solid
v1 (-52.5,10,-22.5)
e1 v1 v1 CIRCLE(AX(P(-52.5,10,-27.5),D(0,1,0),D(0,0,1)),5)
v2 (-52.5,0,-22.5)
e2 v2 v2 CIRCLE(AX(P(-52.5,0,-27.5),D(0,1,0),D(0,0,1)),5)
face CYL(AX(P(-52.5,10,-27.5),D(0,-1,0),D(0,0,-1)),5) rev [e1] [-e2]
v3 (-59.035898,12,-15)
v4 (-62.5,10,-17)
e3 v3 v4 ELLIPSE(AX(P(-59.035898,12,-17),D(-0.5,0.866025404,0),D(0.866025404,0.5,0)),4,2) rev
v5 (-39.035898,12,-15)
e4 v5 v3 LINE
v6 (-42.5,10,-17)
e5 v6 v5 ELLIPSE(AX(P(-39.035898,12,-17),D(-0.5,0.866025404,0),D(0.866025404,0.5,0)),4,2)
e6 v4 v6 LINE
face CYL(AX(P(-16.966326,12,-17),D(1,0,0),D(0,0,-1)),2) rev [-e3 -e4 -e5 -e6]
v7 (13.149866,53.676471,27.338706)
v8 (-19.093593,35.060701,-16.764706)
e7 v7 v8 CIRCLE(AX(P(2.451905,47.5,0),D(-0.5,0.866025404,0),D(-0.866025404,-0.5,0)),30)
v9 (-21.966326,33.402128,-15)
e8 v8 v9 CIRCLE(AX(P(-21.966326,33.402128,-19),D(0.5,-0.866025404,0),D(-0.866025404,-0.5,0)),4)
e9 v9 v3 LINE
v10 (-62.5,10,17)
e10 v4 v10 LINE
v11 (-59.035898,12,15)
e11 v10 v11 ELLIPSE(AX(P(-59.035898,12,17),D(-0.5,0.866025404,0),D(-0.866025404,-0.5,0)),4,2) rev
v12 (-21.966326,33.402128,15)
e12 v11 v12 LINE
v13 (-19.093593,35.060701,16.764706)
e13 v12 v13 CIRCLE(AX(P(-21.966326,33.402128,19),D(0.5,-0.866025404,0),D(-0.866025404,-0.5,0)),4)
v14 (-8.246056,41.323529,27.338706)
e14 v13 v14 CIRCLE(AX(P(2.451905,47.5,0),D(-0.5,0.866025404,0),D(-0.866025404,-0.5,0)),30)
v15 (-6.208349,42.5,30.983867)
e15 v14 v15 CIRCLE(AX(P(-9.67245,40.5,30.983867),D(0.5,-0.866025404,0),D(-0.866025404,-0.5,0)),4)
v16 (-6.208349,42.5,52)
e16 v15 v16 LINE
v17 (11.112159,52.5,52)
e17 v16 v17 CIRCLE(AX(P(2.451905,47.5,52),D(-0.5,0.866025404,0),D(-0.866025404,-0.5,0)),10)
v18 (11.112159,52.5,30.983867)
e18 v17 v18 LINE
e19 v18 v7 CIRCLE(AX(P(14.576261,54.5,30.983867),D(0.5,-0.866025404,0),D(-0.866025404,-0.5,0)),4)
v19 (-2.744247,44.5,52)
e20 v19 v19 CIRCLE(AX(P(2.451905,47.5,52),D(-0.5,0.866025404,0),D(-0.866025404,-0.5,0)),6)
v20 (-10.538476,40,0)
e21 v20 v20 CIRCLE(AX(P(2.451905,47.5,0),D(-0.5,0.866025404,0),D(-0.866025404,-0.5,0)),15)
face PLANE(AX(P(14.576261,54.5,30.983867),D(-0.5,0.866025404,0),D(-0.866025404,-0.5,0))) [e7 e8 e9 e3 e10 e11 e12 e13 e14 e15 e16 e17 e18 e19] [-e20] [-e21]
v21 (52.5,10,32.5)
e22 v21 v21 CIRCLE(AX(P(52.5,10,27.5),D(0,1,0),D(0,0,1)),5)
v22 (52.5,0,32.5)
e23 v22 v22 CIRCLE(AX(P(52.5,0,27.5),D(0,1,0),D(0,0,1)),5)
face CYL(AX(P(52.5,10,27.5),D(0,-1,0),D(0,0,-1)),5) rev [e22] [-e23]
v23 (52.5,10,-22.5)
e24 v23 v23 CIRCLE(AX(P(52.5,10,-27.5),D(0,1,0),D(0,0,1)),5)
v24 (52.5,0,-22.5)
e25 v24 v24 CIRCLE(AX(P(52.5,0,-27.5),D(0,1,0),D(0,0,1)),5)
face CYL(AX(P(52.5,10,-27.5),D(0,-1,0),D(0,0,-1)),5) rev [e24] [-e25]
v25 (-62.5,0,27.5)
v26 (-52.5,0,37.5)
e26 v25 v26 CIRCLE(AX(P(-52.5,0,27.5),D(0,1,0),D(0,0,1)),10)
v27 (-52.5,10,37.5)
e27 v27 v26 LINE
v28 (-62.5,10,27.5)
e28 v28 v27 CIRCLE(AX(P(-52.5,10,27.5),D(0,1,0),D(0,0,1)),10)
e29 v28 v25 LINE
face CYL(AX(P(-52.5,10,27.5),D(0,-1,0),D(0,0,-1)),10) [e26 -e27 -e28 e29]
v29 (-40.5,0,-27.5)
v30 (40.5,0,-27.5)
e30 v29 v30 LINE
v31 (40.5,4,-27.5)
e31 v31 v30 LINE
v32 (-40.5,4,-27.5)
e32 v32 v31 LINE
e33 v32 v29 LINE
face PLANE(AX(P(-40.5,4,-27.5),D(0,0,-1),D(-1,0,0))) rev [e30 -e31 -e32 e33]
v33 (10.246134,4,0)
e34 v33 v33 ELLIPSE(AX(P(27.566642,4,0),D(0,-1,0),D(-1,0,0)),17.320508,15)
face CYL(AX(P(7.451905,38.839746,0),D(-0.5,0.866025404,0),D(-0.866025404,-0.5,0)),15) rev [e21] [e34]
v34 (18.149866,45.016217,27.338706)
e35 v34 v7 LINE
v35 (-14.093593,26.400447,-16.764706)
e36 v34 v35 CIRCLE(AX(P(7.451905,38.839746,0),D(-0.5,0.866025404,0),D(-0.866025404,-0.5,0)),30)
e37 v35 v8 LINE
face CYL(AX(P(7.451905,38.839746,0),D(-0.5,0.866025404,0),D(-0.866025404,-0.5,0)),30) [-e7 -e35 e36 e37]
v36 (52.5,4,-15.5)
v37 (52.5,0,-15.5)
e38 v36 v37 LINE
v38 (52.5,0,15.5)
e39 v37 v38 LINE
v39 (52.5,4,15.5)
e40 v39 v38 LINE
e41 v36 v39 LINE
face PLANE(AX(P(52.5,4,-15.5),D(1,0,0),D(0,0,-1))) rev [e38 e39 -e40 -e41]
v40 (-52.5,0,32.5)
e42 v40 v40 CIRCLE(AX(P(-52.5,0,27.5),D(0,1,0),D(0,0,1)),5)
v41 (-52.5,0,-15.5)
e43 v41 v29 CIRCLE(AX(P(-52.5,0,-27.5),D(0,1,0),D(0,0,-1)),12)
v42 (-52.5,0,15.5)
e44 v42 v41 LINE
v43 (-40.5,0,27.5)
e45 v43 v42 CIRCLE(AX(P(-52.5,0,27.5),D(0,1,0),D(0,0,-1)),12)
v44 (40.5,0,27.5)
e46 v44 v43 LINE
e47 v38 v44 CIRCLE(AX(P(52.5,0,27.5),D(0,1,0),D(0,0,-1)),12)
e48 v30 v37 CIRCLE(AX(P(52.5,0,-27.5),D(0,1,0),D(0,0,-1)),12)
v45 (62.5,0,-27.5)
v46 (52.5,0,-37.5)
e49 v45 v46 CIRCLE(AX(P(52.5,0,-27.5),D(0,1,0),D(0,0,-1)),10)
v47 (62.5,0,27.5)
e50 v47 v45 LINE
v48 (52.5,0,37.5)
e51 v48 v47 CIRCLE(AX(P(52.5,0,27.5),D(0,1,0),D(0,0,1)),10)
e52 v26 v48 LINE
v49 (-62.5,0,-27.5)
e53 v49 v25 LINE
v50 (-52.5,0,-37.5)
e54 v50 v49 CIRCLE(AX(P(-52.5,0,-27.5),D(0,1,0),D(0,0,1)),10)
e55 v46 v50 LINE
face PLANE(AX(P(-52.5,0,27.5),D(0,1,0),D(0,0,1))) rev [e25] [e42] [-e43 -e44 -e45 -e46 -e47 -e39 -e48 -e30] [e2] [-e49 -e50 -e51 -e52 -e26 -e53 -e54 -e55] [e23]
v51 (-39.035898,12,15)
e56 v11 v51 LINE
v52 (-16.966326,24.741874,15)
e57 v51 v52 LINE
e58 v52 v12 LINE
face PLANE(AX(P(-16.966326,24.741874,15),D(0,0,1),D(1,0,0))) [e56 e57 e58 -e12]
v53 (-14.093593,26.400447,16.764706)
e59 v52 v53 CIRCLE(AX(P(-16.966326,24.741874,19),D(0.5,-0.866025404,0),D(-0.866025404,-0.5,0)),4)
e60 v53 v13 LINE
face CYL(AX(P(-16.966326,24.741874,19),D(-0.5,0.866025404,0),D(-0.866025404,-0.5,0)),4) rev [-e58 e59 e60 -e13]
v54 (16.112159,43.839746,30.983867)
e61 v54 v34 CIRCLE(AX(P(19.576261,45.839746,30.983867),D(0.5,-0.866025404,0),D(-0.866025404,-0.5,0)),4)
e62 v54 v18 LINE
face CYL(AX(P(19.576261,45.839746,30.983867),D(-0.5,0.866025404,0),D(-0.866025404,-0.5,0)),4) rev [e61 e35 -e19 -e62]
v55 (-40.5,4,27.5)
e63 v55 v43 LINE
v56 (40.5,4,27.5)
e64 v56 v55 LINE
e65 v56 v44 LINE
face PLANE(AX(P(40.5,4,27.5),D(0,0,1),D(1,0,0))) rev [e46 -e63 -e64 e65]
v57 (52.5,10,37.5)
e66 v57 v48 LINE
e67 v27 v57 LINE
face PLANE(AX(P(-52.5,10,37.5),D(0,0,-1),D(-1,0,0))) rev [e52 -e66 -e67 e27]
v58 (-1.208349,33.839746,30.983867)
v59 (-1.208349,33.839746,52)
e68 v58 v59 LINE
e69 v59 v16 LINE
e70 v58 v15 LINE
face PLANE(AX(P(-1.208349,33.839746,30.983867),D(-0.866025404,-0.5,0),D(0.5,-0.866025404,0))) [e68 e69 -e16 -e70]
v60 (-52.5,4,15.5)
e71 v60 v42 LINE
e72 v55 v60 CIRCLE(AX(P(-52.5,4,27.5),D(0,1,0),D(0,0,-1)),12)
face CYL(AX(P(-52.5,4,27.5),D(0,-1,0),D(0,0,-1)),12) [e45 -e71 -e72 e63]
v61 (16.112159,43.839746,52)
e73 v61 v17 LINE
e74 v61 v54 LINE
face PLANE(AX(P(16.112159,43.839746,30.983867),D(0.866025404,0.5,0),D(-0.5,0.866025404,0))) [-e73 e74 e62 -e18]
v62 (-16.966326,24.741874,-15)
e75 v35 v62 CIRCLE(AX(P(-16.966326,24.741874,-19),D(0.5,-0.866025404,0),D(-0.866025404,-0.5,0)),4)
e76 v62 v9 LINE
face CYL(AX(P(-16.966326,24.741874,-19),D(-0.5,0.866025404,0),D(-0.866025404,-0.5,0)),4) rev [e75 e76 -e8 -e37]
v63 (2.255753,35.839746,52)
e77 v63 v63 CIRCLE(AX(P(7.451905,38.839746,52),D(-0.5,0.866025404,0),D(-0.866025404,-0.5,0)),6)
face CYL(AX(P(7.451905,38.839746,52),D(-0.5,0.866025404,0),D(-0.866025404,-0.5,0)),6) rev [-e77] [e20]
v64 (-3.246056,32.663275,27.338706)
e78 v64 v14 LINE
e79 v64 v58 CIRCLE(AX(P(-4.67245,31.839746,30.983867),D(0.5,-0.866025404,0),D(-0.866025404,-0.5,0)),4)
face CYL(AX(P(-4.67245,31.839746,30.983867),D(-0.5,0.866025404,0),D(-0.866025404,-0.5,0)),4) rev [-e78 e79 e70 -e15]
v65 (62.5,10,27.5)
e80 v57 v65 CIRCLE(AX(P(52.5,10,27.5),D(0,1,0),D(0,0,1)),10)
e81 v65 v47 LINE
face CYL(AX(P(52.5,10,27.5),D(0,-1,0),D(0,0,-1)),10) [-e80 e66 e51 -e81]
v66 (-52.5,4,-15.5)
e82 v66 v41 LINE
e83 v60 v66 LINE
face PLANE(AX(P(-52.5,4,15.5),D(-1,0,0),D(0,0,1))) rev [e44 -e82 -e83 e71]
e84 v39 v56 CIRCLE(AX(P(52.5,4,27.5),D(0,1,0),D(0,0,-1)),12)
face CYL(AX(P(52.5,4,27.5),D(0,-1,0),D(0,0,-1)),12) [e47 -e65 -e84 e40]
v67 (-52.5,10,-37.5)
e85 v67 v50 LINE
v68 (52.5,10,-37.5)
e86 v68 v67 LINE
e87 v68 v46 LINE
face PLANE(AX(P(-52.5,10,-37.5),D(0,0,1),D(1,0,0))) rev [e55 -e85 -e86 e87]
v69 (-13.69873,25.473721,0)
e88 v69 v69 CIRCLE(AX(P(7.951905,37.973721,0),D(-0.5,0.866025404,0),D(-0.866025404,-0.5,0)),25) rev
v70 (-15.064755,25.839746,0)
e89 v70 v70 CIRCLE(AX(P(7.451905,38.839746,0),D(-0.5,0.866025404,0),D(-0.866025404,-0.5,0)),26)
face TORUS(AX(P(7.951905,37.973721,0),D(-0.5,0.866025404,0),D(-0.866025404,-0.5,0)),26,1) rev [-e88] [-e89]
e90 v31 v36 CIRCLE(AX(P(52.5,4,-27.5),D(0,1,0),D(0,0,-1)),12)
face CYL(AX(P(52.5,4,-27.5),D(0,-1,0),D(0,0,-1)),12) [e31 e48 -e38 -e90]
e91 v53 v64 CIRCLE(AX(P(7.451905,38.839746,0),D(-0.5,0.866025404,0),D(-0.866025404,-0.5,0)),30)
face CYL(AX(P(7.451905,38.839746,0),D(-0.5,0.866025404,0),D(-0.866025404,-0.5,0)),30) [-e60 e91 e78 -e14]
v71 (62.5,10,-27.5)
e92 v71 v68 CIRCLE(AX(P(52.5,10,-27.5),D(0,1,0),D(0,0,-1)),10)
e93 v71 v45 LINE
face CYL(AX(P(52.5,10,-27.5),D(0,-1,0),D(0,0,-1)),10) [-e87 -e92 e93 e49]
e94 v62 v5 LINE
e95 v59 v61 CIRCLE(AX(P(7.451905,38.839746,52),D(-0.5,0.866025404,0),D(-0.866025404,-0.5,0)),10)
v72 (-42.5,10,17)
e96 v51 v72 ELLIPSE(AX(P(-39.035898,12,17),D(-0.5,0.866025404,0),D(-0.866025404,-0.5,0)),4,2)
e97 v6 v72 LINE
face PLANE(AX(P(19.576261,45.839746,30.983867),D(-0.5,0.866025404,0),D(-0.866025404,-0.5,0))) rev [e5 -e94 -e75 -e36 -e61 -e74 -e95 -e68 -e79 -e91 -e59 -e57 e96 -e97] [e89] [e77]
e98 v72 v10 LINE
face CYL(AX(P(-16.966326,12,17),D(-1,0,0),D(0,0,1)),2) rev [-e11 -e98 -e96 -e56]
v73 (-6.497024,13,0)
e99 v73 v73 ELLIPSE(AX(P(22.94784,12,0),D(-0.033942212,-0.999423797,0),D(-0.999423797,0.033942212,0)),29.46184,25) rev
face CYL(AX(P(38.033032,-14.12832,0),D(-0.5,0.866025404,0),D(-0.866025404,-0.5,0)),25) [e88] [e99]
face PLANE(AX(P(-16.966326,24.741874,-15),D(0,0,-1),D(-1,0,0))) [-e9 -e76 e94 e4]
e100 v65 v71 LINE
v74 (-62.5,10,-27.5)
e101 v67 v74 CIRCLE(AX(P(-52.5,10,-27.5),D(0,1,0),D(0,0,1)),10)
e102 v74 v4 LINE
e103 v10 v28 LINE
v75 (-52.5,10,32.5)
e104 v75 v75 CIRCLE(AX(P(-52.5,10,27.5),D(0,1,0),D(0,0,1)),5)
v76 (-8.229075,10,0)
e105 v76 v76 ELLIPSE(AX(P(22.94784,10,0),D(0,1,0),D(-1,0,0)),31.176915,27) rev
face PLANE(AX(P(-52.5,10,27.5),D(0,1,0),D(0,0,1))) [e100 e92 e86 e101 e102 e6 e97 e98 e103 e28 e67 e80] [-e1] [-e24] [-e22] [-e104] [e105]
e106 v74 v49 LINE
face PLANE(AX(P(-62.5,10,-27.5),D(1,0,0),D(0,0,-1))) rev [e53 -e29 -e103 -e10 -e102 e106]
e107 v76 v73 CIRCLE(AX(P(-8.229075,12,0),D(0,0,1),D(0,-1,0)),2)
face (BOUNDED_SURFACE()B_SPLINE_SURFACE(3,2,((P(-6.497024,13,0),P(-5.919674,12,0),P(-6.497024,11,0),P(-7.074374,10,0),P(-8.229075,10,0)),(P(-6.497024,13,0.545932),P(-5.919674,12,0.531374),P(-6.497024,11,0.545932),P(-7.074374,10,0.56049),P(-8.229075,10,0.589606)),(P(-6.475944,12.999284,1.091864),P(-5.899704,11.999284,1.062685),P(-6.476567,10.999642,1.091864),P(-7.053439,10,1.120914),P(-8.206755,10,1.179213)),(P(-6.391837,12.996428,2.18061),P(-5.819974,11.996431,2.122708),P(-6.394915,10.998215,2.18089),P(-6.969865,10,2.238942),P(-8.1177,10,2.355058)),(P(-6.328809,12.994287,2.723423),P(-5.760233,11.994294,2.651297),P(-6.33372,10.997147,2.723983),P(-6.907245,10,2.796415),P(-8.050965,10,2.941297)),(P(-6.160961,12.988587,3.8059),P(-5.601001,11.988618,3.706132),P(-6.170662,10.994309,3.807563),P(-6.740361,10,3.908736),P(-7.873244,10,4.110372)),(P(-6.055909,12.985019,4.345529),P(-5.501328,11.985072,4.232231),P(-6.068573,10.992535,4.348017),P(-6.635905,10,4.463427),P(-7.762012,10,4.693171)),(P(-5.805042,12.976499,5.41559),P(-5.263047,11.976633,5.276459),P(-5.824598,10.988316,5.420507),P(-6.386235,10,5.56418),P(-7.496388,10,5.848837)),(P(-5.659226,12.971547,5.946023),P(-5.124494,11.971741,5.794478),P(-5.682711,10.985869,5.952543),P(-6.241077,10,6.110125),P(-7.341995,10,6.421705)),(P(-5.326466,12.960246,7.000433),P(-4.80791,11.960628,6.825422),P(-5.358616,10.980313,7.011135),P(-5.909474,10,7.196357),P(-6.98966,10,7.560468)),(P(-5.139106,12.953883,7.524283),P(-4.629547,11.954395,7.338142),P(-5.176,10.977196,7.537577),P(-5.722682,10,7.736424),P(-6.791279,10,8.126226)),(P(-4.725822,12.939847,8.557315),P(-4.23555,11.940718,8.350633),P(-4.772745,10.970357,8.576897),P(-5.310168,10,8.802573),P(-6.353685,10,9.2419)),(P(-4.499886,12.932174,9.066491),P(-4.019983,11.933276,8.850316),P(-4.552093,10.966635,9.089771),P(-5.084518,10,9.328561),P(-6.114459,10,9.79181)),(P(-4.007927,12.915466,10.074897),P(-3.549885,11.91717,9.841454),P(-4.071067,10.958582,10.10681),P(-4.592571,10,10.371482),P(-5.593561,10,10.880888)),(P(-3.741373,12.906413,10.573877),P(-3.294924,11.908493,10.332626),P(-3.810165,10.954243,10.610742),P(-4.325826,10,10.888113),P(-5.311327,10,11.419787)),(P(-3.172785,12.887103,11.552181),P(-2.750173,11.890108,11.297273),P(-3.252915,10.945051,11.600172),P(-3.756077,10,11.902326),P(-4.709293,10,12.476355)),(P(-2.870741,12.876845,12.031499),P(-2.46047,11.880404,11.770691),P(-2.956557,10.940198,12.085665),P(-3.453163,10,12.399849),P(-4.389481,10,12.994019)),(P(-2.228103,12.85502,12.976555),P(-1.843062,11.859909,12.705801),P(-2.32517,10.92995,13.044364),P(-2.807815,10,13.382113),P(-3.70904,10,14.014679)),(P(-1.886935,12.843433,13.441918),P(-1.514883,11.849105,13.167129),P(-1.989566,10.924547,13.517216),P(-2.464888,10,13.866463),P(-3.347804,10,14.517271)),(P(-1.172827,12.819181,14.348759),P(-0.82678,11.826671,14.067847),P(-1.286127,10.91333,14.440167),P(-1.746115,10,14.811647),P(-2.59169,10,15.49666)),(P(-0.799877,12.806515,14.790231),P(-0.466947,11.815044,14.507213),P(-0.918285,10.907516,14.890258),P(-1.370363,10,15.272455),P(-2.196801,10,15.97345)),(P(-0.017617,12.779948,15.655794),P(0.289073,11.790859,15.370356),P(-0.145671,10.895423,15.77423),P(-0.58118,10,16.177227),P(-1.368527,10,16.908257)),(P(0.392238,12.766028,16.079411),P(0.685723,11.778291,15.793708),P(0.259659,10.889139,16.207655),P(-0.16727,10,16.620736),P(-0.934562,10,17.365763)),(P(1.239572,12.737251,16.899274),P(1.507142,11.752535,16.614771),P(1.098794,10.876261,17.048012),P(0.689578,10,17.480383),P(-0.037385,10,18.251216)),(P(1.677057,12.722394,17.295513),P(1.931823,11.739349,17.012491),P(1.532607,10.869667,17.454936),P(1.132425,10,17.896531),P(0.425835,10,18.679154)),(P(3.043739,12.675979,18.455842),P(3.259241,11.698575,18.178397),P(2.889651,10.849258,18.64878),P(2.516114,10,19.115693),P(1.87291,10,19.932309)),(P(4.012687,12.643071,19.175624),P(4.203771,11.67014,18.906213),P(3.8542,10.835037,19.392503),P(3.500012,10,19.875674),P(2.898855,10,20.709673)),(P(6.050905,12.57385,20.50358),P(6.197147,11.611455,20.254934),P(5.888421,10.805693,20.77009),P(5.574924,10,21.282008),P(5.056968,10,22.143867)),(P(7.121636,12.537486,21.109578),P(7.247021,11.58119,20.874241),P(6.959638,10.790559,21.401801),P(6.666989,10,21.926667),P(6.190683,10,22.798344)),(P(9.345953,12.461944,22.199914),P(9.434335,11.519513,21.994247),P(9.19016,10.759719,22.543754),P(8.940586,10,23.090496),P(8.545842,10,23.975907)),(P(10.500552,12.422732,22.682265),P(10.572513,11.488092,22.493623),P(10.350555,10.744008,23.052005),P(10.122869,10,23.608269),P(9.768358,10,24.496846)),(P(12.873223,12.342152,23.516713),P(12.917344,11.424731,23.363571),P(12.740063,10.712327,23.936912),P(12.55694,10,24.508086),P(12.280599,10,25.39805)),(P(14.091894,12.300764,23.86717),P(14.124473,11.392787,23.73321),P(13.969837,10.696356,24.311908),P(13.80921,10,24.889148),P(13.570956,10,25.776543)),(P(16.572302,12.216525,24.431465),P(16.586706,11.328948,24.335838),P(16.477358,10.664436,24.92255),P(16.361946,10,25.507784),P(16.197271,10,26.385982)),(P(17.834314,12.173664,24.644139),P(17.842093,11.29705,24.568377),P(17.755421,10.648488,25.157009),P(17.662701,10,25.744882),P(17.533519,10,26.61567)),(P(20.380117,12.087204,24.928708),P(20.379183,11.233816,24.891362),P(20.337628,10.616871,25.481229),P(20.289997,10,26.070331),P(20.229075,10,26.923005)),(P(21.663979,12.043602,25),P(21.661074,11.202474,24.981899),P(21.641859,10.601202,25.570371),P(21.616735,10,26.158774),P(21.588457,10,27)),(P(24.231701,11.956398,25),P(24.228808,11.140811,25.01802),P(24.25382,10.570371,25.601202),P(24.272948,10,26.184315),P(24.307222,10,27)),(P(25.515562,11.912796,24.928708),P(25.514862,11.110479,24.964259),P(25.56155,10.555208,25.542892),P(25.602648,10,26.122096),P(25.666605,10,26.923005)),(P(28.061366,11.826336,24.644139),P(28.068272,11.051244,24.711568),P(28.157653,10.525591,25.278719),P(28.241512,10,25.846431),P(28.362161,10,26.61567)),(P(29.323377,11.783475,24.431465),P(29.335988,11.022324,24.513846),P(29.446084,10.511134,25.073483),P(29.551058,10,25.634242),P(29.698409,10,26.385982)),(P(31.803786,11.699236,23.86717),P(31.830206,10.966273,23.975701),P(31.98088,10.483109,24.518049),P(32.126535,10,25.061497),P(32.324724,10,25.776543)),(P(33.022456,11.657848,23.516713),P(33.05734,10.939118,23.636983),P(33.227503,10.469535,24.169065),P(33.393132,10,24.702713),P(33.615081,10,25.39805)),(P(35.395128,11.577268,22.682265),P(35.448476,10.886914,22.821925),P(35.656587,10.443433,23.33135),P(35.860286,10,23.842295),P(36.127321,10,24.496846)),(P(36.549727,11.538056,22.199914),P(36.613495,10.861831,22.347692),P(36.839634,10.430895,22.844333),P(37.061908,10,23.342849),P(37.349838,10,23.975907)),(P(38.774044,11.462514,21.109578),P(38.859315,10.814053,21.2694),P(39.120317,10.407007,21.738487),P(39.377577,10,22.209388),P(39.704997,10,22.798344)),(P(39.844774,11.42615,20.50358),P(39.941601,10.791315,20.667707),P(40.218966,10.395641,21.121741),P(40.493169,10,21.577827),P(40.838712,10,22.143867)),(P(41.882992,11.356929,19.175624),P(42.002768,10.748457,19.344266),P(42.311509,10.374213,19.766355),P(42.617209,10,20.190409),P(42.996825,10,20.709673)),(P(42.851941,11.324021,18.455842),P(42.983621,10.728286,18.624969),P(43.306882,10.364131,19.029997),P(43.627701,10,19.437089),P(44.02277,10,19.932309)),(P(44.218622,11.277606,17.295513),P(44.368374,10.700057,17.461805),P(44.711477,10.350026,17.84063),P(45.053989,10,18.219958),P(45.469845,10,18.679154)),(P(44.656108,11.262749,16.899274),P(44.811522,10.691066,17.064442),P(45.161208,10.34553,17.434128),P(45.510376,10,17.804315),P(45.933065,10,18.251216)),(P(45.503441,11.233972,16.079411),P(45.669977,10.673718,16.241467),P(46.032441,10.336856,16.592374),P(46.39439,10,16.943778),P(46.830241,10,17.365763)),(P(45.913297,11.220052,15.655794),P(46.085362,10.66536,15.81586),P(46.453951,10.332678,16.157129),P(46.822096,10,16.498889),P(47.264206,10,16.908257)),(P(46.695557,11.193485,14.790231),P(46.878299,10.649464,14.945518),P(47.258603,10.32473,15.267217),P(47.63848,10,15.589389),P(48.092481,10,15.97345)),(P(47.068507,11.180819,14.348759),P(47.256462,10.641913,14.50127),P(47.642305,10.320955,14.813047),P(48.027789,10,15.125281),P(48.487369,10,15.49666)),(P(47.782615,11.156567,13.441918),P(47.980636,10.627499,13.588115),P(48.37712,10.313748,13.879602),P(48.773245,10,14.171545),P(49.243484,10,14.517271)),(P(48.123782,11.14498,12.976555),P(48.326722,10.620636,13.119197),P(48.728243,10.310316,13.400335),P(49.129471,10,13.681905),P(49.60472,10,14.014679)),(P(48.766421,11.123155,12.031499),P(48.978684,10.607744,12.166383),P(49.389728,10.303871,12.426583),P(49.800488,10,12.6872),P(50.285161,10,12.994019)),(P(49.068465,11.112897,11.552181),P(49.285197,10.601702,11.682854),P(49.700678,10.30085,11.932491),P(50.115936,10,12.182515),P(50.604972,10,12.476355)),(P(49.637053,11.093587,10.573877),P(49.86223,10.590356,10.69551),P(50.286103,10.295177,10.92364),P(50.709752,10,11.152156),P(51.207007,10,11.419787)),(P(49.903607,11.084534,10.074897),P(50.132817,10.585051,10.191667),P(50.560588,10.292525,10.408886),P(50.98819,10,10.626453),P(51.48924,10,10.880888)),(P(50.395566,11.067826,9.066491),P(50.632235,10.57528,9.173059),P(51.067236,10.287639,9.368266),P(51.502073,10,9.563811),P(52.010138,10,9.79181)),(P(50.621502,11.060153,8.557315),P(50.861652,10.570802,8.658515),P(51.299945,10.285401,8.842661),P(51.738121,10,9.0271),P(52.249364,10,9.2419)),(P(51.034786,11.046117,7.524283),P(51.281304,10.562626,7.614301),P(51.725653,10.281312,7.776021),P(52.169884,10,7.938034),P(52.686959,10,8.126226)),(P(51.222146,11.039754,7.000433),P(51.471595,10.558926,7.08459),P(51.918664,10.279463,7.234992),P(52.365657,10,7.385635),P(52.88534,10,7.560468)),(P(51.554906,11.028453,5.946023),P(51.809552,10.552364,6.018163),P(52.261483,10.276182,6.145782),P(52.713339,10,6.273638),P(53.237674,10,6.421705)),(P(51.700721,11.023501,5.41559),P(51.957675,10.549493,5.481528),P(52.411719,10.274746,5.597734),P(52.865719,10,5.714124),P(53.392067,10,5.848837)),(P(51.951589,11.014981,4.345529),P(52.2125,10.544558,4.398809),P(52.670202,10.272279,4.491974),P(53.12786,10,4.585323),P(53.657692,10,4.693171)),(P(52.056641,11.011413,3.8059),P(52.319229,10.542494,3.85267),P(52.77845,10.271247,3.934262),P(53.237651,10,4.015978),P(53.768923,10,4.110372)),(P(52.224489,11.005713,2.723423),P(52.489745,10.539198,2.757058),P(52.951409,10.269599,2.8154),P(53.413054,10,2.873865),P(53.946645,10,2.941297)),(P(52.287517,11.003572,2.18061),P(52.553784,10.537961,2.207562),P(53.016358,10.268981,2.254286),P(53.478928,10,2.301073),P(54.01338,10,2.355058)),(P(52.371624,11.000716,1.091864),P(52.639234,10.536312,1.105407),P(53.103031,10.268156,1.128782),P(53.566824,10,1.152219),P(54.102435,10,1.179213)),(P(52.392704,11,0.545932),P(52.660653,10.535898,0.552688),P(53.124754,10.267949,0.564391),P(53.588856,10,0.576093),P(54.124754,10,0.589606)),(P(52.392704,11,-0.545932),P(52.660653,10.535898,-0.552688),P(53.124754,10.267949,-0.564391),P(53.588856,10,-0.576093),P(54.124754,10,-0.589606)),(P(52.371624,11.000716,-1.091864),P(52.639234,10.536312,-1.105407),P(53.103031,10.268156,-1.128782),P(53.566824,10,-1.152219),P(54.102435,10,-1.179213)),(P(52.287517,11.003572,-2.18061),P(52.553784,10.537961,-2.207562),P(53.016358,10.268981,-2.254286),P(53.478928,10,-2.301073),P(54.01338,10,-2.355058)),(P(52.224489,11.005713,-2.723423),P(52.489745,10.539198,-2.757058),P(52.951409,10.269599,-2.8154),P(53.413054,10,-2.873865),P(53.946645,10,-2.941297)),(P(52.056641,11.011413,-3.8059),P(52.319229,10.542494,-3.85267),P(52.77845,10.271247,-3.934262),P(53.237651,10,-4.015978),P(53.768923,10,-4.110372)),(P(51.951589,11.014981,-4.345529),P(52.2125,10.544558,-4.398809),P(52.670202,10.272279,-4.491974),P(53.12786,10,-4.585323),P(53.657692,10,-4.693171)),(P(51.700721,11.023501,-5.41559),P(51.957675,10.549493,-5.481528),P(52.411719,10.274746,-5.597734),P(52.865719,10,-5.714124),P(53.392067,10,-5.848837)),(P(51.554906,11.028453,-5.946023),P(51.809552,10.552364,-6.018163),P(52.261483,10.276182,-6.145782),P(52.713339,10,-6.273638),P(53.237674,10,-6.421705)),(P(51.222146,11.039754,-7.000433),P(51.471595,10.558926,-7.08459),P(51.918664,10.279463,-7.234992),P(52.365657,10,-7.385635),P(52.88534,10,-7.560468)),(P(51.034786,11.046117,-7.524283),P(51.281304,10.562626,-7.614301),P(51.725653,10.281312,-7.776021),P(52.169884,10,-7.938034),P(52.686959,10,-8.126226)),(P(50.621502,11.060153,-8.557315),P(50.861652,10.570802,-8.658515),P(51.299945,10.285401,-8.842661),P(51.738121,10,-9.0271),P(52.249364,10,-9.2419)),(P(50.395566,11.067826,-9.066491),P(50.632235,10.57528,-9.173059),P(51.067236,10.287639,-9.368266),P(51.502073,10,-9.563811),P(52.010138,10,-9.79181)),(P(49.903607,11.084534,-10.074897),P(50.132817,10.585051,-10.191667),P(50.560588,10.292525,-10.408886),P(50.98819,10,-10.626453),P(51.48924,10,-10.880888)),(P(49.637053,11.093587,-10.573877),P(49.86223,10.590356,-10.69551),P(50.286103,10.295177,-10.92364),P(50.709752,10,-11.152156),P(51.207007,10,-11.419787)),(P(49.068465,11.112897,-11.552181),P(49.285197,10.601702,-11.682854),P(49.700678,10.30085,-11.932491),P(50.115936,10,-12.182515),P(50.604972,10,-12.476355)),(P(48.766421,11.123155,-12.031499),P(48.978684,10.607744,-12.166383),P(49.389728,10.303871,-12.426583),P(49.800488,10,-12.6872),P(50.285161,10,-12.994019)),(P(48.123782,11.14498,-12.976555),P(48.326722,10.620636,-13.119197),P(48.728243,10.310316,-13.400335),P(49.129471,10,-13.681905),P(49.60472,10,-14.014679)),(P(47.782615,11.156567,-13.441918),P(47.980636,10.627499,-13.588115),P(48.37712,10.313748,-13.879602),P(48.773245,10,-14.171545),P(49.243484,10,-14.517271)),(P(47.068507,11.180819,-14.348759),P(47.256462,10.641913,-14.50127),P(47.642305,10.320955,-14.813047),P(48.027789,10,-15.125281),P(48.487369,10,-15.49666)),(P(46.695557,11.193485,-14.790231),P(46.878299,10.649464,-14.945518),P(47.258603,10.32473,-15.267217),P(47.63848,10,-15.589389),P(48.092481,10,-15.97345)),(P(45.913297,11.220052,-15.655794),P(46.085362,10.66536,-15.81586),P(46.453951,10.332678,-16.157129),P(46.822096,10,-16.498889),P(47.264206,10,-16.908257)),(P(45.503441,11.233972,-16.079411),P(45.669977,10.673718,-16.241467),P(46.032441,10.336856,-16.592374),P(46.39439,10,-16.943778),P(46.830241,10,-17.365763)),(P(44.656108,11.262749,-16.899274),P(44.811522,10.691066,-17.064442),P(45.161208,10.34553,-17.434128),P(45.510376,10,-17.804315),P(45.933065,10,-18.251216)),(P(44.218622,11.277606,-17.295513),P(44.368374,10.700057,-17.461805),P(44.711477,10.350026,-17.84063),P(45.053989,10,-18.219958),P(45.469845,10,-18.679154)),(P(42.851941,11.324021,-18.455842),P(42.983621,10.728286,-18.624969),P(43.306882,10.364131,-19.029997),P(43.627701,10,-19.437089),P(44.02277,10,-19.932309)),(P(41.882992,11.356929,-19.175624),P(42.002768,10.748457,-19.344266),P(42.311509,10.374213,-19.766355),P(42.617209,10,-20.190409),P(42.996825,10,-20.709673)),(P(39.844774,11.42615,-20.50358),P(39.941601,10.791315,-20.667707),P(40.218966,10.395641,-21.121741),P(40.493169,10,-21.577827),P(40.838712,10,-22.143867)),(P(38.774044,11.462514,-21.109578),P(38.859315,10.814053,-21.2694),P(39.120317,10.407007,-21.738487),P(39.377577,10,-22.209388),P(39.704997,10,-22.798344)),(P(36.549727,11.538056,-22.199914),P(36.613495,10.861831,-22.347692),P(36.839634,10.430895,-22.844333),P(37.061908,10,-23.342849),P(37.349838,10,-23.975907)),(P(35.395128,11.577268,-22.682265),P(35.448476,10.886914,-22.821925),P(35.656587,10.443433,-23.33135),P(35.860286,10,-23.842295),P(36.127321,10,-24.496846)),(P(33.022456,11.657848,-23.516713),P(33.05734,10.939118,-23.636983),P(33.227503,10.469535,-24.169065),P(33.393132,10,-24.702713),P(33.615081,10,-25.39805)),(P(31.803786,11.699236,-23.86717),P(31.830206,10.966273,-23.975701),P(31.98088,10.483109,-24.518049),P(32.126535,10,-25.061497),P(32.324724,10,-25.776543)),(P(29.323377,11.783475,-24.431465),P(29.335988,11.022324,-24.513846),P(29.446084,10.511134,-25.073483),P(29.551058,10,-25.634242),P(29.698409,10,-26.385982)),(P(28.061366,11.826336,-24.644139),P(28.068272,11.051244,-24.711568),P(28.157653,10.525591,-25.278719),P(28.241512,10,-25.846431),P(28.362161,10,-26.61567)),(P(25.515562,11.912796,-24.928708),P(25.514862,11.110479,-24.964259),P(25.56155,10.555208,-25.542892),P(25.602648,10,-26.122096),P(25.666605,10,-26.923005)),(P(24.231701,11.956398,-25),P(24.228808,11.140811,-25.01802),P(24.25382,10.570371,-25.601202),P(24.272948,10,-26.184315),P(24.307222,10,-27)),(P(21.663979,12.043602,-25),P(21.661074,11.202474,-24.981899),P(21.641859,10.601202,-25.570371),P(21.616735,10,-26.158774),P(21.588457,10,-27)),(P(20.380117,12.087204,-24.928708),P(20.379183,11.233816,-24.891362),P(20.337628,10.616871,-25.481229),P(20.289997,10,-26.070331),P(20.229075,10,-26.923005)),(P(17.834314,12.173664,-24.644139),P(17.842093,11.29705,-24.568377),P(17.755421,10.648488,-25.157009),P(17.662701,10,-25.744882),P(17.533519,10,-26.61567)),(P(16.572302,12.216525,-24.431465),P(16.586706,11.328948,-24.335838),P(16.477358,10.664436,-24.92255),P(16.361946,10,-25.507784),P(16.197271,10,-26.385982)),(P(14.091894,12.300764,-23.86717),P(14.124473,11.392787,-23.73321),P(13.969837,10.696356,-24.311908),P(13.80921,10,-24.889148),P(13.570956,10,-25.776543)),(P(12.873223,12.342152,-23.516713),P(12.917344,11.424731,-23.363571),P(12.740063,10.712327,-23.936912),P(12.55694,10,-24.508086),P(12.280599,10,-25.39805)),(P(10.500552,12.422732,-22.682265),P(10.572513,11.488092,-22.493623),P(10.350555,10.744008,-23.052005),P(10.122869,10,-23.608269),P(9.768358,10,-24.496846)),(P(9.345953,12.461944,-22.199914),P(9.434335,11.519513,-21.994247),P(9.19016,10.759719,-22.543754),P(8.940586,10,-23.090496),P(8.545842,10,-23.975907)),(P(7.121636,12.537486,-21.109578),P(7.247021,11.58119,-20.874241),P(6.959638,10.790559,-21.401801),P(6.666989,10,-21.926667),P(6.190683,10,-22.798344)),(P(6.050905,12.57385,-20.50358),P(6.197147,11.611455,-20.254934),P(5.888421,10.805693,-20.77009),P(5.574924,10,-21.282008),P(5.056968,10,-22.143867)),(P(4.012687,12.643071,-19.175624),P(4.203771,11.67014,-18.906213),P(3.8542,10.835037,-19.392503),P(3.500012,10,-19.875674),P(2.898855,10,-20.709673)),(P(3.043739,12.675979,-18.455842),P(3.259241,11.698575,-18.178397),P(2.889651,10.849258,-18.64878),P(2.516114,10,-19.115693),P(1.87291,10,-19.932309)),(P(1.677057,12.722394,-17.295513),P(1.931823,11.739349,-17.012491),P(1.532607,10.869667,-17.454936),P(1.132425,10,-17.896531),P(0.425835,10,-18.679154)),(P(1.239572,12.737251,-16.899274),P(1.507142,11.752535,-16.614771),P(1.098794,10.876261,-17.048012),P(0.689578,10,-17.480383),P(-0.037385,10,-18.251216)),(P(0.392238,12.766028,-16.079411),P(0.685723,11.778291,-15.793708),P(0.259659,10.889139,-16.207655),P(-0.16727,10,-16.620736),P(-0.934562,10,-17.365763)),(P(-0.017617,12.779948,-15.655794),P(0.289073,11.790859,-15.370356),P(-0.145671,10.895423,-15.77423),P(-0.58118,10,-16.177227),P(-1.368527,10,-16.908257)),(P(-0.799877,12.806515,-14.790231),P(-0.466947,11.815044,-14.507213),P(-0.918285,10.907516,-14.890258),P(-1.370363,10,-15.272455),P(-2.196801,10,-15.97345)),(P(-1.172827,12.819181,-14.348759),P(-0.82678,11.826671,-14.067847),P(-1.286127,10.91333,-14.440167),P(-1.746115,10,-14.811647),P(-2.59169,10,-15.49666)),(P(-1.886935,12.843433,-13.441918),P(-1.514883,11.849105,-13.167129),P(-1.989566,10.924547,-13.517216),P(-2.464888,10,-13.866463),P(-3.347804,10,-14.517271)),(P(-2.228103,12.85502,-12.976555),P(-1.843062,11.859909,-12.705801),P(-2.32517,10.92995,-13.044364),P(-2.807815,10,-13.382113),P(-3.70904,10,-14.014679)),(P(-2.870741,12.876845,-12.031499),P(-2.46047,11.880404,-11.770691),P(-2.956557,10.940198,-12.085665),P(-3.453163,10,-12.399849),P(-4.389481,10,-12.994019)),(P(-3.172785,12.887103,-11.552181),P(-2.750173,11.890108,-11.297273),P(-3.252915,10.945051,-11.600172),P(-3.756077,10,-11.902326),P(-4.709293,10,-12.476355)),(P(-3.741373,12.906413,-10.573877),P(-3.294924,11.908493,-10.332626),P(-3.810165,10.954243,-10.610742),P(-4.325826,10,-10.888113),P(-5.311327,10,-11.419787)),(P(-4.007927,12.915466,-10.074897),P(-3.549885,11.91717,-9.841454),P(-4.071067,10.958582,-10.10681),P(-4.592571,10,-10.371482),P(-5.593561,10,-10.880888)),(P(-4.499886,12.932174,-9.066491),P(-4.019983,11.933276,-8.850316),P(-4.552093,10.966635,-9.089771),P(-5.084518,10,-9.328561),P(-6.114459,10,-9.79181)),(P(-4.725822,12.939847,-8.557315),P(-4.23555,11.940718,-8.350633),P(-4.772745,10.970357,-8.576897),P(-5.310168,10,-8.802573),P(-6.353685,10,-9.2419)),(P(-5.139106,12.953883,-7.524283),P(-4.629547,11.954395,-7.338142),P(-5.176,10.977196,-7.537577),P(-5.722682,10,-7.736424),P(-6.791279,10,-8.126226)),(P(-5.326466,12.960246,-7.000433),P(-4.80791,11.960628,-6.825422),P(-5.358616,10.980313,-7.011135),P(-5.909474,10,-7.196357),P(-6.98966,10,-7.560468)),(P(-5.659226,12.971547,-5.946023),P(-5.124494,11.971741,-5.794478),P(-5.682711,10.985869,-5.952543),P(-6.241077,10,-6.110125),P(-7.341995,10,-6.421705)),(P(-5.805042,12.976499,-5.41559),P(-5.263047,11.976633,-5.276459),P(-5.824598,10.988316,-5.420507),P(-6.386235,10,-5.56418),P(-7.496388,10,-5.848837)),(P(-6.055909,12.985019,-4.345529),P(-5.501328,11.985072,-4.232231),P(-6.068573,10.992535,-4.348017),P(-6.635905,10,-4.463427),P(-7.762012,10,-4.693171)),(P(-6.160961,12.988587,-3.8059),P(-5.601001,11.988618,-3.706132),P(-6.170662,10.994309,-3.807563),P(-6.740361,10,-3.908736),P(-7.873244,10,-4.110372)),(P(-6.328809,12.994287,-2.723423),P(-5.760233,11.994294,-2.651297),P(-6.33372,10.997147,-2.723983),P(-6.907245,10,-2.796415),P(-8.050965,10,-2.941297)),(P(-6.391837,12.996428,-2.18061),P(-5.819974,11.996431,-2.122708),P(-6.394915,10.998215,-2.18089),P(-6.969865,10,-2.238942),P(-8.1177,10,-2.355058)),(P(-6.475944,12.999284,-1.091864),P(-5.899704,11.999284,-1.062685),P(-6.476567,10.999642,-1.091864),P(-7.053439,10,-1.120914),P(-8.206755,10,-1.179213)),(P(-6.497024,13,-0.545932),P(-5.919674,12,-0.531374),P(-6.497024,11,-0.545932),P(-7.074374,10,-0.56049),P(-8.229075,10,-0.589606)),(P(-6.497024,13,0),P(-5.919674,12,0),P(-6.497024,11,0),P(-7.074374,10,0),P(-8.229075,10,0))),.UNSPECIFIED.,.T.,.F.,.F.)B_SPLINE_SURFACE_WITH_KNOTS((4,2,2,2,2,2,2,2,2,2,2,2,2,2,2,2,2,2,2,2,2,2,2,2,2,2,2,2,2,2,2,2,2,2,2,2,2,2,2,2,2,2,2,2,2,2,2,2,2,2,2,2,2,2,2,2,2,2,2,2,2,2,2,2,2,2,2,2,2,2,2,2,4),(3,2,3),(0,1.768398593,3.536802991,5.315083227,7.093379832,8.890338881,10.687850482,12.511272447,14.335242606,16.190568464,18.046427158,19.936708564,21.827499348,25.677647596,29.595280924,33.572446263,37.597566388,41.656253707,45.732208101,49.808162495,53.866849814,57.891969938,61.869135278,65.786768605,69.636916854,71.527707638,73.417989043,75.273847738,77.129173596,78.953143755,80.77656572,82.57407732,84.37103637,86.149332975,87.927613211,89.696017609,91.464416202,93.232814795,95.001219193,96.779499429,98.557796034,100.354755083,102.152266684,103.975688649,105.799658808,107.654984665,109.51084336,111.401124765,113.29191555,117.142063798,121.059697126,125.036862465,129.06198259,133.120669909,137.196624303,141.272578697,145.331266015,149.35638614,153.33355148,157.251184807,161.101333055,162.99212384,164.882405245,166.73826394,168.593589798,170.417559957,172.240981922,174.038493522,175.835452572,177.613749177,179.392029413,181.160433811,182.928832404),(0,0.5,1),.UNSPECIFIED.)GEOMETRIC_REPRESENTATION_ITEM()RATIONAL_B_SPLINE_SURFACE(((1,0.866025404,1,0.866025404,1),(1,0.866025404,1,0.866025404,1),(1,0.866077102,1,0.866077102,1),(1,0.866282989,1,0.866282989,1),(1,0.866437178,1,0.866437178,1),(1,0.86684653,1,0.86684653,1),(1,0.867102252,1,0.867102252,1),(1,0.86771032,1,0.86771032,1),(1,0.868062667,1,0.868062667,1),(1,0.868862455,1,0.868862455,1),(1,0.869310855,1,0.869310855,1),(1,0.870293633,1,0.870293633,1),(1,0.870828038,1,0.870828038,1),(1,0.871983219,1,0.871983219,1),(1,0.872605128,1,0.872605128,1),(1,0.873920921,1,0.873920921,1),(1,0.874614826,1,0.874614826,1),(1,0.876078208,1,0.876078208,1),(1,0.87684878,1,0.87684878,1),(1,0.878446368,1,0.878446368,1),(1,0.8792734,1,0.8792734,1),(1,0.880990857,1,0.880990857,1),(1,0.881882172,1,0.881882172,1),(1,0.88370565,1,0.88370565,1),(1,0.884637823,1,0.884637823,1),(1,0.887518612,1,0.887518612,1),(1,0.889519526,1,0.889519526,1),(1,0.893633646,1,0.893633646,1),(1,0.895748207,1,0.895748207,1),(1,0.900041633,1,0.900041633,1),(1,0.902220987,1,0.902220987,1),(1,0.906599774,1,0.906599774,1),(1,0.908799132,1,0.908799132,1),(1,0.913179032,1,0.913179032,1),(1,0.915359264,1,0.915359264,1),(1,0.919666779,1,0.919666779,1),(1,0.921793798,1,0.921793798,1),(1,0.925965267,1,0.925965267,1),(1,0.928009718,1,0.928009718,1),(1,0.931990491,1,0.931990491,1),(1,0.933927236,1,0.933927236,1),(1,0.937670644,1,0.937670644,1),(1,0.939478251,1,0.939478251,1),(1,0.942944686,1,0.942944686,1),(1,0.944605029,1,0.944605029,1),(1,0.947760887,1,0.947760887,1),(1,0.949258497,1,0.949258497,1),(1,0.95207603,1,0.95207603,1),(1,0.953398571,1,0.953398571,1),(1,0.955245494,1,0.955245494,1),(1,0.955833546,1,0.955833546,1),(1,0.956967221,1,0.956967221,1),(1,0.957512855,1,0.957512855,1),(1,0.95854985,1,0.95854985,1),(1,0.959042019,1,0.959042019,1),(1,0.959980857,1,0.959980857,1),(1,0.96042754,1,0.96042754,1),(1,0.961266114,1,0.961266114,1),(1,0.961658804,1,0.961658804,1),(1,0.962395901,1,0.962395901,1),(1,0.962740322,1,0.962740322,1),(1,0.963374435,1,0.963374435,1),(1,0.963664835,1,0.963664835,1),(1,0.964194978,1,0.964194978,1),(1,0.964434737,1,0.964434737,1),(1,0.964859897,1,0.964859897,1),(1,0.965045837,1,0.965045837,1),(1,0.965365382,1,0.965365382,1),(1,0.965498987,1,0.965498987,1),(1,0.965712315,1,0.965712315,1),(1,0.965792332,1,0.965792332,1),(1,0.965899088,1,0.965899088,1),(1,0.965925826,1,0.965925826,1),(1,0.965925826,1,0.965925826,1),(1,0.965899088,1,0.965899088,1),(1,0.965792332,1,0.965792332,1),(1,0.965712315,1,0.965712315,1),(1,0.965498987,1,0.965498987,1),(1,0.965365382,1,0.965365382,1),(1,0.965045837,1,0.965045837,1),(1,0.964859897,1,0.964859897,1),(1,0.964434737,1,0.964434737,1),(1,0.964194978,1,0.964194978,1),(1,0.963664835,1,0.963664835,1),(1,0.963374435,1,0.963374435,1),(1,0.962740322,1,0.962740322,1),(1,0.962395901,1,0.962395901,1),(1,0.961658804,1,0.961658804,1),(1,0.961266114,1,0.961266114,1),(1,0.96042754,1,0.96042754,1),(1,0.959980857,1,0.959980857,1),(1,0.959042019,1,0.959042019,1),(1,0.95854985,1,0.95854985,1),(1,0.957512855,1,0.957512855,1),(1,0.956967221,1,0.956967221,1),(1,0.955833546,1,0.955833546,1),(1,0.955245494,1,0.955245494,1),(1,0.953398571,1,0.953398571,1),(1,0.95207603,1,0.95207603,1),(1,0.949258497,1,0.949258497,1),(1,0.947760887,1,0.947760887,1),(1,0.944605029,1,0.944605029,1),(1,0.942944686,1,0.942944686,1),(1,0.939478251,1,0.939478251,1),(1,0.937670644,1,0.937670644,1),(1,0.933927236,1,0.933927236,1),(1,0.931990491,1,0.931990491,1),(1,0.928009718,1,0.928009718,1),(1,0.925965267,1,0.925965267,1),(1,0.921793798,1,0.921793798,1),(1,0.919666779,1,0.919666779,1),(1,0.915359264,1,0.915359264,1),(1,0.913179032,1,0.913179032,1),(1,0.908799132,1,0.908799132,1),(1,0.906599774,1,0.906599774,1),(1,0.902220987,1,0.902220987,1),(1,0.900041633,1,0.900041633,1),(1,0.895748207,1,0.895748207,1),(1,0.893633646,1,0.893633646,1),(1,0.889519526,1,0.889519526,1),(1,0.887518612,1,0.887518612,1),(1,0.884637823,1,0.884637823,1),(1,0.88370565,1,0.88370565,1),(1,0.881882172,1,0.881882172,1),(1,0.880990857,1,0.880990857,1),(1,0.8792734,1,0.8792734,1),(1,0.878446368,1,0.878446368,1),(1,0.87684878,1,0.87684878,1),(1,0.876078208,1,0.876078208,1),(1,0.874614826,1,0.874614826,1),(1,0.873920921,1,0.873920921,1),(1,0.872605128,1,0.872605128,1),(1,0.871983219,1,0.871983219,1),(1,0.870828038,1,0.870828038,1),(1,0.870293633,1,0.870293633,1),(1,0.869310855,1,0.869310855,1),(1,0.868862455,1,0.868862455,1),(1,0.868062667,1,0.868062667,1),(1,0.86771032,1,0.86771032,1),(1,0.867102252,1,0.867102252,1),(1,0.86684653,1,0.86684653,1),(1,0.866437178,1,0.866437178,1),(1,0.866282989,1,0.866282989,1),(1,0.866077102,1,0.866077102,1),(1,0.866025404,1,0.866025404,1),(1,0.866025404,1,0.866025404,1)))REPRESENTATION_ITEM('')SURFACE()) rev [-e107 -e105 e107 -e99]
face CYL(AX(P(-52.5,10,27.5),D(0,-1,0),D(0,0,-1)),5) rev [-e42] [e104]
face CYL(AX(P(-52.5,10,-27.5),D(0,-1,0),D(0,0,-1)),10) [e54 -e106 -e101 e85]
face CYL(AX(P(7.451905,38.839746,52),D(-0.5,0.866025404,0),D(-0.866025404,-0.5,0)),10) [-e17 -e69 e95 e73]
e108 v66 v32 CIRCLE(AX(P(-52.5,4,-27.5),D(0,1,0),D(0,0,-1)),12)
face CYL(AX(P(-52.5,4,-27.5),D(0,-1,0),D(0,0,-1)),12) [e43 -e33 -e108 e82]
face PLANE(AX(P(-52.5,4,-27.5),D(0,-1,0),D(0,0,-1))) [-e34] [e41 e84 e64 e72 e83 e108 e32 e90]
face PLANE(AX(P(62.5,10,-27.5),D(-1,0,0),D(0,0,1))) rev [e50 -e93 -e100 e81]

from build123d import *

# Parameters (mm, degrees)
SKETCH_1_R          = 5
EXTRUDE_1_DEPTH     = 10
CUT_EXTRUDE_1_DEPTH = 4
SKETCH_4_R          = 15
SKETCH_4_R_2        = 6
EXTRUDE_2_DEPTH     = 10
EXTRUDE_7_REACH     = 107.748
SKETCH_6_R          = 25
SKETCH_13_R         = 15
CUT_EXTRUDE_2_DEPTH = 109.800134443
FILLET_7_R          = 2
FILLET_8_R          = 2
FILLET_9_R          = 2
FILLET_10_R         = 1


with BuildPart() as part:
    # 草图1 → 凸台-拉伸1 (new body)
    with BuildSketch(Plane(origin=(0, 0, 0), x_dir=(1, 0, 0), z_dir=(0, 1, 0))):
        with BuildLine():
            Line((-52.5, 37.5), (52.5, 37.5))
            ThreePointArc((52.5, 37.5), (59.571067812, 34.571067812), (62.5, 27.5))
            Line((62.5, 27.5), (62.5, -27.5))
            ThreePointArc((62.5, -27.5), (59.571067812, -34.571067812), (52.5, -37.5))
            Line((52.5, -37.5), (-52.5, -37.5))
            ThreePointArc((-52.5, -37.5), (-59.571067812, -34.571067812), (-62.5, -27.5))
            Line((-62.5, -27.5), (-62.5, 27.5))
            ThreePointArc((-62.5, 27.5), (-59.571067812, 34.571067812), (-52.5, 37.5))
        make_face()
        with Locations(Location((-52.5, -27.5, 0), (0, 0, 270))):
            Circle(SKETCH_1_R, mode=Mode.SUBTRACT)
        with Locations(Location((52.5, -27.5, 0), (0, 0, 270))):
            Circle(SKETCH_1_R, mode=Mode.SUBTRACT)
        with Locations(Location((52.5, 27.5, 0), (0, 0, 270))):
            Circle(SKETCH_1_R, mode=Mode.SUBTRACT)
        with Locations(Location((-52.5, 27.5, 0), (0, 0, 270))):
            Circle(SKETCH_1_R, mode=Mode.SUBTRACT)
    extrude(amount=EXTRUDE_1_DEPTH)

    # 草图5 → 切除-拉伸1 (cut)
    with BuildSketch(Plane.XZ):
        with BuildLine():
            Line((40.5, 27.5), (-40.5, 27.5))
            ThreePointArc((-40.5, 27.5), (-44.014718626, 19.014718626), (-52.5, 15.5))
            Line((-52.5, 15.5), (-52.5, -15.5))
            ThreePointArc((-52.5, -15.5), (-44.014718626, -19.014718626), (-40.5, -27.5))
            Line((-40.5, -27.5), (40.5, -27.5))
            ThreePointArc((40.5, -27.5), (44.014718626, -19.014718626), (52.5, -15.5))
            Line((52.5, -15.5), (52.5, 15.5))
            ThreePointArc((52.5, 15.5), (44.014718626, 19.014718626), (40.5, 27.5))
        make_face()
    extrude(amount=-CUT_EXTRUDE_1_DEPTH, mode=Mode.SUBTRACT)

    # 草图4 → 凸台-拉伸2 (add)
    with BuildSketch(Plane(origin=(-19.955127019, 34.563293868, 0), x_dir=(0, 0, 1), z_dir=(-0.500000000000001, 0.866025403784438, 0))):
        with BuildLine():
            Line((30.98386677, 35.873412263), (52, 35.873412263))
            ThreePointArc((52, 35.873412263), (62, 25.873412263), (52, 15.873412263))
            Line((52, 15.873412263), (30.98386677, 15.873412263))
            ThreePointArc((30.98386677, 15.873412263), (28.814562191, 15.234084465), (27.338705973, 13.520471087))
            ThreePointArc((27.338705973, 13.520471087), (22.923803215, 6.52142926), (16.764705882, 0.994814299))
            ThreePointArc((16.764705882, 0.994814299), (15.468627995, -0.443659223), (15, -2.322332096))
            Line((15, -2.322332096), (15, -49.126587737))
            Line((15, -49.126587737), (-15, -49.126587737))
            Line((-15, -49.126587737), (-15, -2.322332096))
            ThreePointArc((-15, -2.322332096), (-15.468627995, -0.443659223), (-16.764705882, 0.994814299))
            ThreePointArc((-16.764705882, 0.994814299), (-19.351983004, 48.797215478), (27.338705973, 38.22635344))
            ThreePointArc((27.338705973, 38.22635344), (28.814562191, 36.512740062), (30.98386677, 35.873412263))
        make_face()
        with Locations(Location((0, 25.873412263, 0), (0, 0, 270))):
            Circle(SKETCH_4_R, mode=Mode.SUBTRACT)
        with Locations(Location((52, 25.873412263, 0), (0, 0, 270))):
            Circle(SKETCH_4_R_2, mode=Mode.SUBTRACT)
    extrude(amount=-EXTRUDE_2_DEPTH)

    # 凸台-拉伸7: up to this plane
    extrude_7_end = Plane(origin=(-52.5, 10, 27.5), z_dir=(0, 1, 0))
    # 草图6 → 凸台-拉伸7 (add, up to the surface)
    with BuildSketch(Plane(origin=(-14.955127019, 25.90303983, 0), x_dir=(0.8660254037844382, 0.500000000000001, 0), z_dir=(0.500000000000001, -0.8660254037844382, 0)), mode=Mode.PRIVATE) as extrude_7_sk1:
        with Locations(Location((25.873412263, 0, 0), (0, 0, 180))):
            Circle(SKETCH_6_R)
    extrude_7_tool1 = split(extrude(extrude_7_sk1.sketch, amount=EXTRUDE_7_REACH, mode=Mode.PRIVATE), bisect_by=extrude_7_end, keep=Keep.BOTH, mode=Mode.PRIVATE)
    add(extrude_7_tool1.solids().sort_by_distance((7.451905, 38.839746, 0))[0])

    # 草图13 → 切除-拉伸2 (cut, through all)
    with BuildSketch(Plane(origin=(-19.955127019, 34.563293868, 0), x_dir=(0, 0, 1), z_dir=(-0.500000000000001, 0.866025403784438, 0))):
        with Locations(Location((0, 25.873412263, 0), (0, 0, 270))):
            Circle(SKETCH_13_R)
    extrude(amount=-CUT_EXTRUDE_2_DEPTH, mode=Mode.SUBTRACT)

    # 圆角7
    fillet_7_edges = [part.edges().sort_by_distance(p)[0] for p in [
        (-52.5, 10, 15),
    ]]
    fillet(fillet_7_edges, radius=FILLET_7_R)

    # 圆角8
    # the kernel refuses this fillet: 2 mm, written as the material it adds along each edge
    with BuildSketch(Plane(origin=(-37.5, 10, -15), x_dir=(0, 0, -1), z_dir=(-1, 0, 0))) as fillet_8_piece_1_section:
        with BuildLine():
            CenterArc((FILLET_8_R, -FILLET_8_R), FILLET_8_R, 90, 90)
            Line((0, -FILLET_8_R), (0, 0))
            Line((0, 0), (FILLET_8_R, 0))
        make_face()
    fillet_8_piece_1 = extrude(amount=25, mode=Mode.PRIVATE)
    fillet_8_piece_1 = split(fillet_8_piece_1, bisect_by=Plane(origin=(-49.214592268, 6.123328347, -15.452717167), z_dir=(-0.500000000000001, 0.866025403784438, 0)), keep=Keep.TOP, mode=Mode.PRIVATE)
    fillet_8_piece_1 = split(fillet_8_piece_1, bisect_by=Plane(origin=(-54.214592268, 14.783582385, -15.452717167), z_dir=(0.500000000000001, -0.866025403784438, 0)), keep=Keep.TOP, mode=Mode.PRIVATE)
    add(fillet_8_piece_1)

    # 圆角9
    fillet_9_edges = [part.edges().sort_by_distance(p)[0] for p in [
        (52.970053814, 10, -0.001007854),
    ]]
    fillet(fillet_9_edges, radius=FILLET_9_R)

    # 圆角10
    fillet_10_edges = [part.edges().sort_by_distance(p)[0] for p in [
        (29.102540378, 51.339745962, 0),
    ]]
    fillet(fillet_10_edges, radius=FILLET_10_R)


solid = part.part
